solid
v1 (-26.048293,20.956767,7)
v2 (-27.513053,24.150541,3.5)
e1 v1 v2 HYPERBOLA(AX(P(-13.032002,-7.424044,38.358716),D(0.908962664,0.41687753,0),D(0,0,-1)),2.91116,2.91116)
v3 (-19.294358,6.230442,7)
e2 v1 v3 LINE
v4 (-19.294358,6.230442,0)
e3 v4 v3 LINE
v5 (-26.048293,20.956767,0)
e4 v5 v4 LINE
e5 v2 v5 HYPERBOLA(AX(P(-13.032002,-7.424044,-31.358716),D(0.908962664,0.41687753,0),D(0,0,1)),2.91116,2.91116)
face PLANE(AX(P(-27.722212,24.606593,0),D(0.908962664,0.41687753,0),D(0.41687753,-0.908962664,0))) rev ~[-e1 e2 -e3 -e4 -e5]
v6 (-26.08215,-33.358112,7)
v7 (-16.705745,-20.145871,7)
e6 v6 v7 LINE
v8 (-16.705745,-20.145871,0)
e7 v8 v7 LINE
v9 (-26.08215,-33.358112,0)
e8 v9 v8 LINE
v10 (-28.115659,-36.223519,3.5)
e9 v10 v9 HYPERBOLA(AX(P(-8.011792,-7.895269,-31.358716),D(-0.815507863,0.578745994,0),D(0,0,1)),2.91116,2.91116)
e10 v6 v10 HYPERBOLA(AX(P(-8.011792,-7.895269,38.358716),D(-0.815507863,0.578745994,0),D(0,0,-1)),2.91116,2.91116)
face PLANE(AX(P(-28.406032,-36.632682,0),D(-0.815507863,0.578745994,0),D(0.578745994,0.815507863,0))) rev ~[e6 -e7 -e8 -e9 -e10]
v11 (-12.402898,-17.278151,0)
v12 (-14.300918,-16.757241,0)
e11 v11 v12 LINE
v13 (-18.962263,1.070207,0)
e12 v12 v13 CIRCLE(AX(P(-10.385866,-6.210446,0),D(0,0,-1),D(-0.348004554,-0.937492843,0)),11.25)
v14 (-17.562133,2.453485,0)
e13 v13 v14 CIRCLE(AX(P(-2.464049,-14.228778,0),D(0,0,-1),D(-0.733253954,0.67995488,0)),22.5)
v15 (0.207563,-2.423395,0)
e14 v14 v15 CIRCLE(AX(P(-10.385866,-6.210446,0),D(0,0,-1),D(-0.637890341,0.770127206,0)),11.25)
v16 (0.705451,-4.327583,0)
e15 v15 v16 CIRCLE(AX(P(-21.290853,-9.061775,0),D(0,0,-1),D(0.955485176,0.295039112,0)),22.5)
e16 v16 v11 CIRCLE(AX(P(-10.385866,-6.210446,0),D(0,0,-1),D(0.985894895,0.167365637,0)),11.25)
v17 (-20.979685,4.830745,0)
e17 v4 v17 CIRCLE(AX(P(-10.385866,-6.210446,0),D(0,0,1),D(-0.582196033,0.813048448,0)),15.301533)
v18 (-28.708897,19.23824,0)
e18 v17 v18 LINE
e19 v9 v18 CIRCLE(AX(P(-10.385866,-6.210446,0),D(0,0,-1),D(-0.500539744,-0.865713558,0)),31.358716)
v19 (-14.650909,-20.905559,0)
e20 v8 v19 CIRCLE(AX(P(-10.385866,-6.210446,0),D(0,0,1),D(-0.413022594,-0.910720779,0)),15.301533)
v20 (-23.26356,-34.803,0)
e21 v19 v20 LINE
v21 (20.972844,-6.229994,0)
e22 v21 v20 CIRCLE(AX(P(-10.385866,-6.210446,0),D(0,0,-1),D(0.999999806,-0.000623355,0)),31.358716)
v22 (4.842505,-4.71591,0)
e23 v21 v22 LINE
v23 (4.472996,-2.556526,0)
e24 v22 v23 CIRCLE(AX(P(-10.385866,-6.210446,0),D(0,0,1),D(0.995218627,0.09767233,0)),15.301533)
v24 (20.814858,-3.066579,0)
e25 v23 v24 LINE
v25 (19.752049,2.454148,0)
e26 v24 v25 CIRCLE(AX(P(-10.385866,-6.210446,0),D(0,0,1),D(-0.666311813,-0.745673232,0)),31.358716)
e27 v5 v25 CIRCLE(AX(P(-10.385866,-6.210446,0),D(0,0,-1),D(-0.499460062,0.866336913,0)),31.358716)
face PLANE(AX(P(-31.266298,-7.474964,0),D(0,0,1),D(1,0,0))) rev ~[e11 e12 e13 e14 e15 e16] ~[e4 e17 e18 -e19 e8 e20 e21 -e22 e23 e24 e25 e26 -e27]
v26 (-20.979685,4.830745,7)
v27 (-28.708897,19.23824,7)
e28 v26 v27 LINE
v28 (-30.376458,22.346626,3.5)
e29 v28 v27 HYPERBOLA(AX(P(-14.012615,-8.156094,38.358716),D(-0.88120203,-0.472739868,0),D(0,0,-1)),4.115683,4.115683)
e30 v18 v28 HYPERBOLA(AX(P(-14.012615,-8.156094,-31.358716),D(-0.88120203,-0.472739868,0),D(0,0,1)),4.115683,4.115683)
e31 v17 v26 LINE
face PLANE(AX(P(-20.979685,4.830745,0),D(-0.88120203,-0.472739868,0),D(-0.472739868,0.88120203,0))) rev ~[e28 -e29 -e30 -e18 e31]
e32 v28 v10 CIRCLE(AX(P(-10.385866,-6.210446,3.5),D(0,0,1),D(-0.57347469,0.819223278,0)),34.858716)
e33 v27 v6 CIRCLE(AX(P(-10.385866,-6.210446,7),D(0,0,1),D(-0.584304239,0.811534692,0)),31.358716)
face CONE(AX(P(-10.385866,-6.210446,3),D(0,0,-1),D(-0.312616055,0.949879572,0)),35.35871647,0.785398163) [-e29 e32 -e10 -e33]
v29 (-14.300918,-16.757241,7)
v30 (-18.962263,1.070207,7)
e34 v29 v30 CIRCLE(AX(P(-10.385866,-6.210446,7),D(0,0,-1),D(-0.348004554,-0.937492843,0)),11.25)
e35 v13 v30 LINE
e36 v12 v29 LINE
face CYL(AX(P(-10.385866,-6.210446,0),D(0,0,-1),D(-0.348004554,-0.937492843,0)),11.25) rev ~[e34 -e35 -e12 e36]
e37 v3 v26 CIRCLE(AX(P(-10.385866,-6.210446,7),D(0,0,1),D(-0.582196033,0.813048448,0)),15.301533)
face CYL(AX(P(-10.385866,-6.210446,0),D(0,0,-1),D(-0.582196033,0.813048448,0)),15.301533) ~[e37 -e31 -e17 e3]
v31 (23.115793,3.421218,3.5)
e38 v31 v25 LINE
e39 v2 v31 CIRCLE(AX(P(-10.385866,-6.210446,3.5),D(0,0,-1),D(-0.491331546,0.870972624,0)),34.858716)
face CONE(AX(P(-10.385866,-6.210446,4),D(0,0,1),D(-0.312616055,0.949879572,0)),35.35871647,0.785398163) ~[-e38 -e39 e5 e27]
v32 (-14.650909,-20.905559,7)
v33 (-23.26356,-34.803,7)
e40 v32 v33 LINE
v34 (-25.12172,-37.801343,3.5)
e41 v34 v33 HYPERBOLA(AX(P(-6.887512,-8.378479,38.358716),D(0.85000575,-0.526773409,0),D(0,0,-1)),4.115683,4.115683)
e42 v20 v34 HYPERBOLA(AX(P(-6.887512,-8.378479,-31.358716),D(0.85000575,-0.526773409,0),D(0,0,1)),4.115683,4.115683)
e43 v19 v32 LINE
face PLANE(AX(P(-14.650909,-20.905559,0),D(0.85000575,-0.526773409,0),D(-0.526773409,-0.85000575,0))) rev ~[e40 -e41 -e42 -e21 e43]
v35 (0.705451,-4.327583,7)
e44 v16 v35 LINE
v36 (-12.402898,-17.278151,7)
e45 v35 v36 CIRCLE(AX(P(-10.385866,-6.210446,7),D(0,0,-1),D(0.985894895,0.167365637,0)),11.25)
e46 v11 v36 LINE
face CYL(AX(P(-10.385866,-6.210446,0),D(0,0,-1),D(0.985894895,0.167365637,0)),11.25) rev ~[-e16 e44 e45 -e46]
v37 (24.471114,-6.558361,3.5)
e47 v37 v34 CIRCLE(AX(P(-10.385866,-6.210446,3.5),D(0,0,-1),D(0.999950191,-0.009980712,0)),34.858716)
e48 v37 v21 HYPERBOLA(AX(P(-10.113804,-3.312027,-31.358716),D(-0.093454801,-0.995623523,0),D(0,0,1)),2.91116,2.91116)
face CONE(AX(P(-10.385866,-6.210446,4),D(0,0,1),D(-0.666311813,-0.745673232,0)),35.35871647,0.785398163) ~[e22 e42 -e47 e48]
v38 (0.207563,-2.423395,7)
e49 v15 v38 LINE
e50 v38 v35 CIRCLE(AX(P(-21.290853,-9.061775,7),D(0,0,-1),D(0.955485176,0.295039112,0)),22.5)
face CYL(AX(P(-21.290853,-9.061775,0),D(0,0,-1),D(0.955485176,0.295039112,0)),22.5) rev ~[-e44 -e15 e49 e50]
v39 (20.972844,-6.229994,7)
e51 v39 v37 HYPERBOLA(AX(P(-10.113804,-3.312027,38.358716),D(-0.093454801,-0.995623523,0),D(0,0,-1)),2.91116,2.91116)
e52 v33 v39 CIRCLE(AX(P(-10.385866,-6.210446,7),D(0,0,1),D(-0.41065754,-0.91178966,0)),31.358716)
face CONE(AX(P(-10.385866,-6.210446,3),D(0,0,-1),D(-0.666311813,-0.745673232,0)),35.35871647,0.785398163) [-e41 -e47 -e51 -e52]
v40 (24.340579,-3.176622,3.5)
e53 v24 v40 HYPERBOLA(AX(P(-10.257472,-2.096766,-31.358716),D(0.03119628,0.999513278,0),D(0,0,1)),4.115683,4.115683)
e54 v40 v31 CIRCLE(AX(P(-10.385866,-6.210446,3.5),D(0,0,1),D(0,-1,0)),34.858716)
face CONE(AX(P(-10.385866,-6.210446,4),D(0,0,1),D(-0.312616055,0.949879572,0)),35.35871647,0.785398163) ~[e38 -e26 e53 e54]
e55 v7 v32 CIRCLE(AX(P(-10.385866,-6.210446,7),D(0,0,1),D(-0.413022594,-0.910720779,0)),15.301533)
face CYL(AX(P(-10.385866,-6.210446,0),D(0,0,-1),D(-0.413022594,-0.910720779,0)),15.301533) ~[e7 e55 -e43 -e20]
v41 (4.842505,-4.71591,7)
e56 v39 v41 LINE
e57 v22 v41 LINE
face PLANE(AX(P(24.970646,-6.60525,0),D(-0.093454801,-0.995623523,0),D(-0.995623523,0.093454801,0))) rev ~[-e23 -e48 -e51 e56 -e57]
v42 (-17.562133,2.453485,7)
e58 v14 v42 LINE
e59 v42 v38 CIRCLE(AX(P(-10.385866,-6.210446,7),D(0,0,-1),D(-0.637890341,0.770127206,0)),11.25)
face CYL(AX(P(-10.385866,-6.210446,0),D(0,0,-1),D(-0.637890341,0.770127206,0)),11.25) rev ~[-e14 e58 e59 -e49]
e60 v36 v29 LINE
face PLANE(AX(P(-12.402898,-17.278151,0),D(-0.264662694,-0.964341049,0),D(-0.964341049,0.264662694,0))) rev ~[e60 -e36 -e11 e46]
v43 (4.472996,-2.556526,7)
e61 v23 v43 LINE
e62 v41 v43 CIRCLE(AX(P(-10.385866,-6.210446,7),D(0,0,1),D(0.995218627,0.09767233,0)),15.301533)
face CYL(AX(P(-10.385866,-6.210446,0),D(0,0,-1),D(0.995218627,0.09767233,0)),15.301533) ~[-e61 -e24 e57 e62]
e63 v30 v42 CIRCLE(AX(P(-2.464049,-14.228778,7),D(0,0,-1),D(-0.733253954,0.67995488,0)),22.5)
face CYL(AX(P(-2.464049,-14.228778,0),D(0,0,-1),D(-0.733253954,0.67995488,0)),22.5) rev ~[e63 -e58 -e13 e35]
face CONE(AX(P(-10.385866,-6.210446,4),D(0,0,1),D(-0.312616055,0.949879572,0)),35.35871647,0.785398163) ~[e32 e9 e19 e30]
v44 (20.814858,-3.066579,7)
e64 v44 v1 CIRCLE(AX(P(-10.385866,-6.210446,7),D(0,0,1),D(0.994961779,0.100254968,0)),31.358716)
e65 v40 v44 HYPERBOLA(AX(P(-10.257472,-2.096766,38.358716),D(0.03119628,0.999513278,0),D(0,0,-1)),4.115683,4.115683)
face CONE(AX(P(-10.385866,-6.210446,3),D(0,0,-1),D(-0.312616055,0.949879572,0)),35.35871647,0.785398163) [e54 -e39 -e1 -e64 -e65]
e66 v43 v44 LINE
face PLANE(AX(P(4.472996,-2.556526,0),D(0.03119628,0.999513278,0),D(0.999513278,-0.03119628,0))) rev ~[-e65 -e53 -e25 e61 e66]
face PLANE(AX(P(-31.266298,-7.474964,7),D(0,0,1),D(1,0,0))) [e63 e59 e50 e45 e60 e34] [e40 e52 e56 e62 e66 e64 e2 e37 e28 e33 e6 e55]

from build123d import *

# Parameters (mm, degrees)
F1_DEPTH     = 7
F2_T2_ANGLE  = 147.8228871573
F2_T4_ANGLE  = 147.8228871573
F2_T6_ANGLE  = 147.8228871573
F2_T8_ANGLE  = 147.8228871573
F2_T10_ANGLE = 147.8228871573
F2_T12_ANGLE = 147.8228871573


# Not quite as in the source:
# - a fillet or chamfer that OpenCascade refuses, or shapes differently, is made with other operations: its cross-section is extruded or revolved along the edge and cut away or added


with BuildPart() as f1:
    # F0 (on Top) → F1 (new body)
    with BuildSketch(Plane.XY):
        with BuildLine():
            Line((-28.4060324401, -36.6326823344), (-16.7057452382, -20.1458706432))
            ThreePointArc((-16.7057452382, -20.1458706432), (-25.4681782111, -8.7912963767), (-20.97968548, 4.8307453711))
            Line((-20.97968548, 4.8307453711), (-30.6144689612, 22.7902857677))
            ThreePointArc((-30.6144689612, 22.7902857677), (-45.7201890255, -7.5236357069), (-28.4060324401, -36.6326823344))
        make_face()
        with BuildLine():
            ThreePointArc((-19.29435824, 6.2304415143), (-5.0797919896, 8.1416439346), (4.4729958499, -2.5565256692))
            Line((4.4729958499, -2.5565256692), (24.8438058142, -3.1923286128))
            ThreePointArc((24.8438058142, -3.1923286128), (6.144039761, 25.0465694426), (-27.722212391, 24.6065933083))
            Line((-27.722212391, 24.6065933083), (-19.29435824, 6.2304415143))
        make_face()
        with BuildLine():
            ThreePointArc((4.9156669829, -6.2104463577), (-1.1968722093, -18.4456132191), (-14.6509092006, -20.9055587751))
            Line((-14.6509092006, -20.9055587751), (-25.3869356838, -38.229296228))
            ThreePointArc((-25.3869356838, -38.229296228), (8.4185504337, -36.154272809), (24.9706460004, -6.6052500471))
            Line((24.9706460004, -6.6052500471), (4.8425046474, -4.7159099443))
            ThreePointArc((4.8425046474, -4.7159099443), (4.8973654542, -5.4622833042), (4.9156669829, -6.2104463577))
        make_face()
        with BuildLine():
            Line((-16.7057452382, -20.1458706432), (-14.3009175091, -16.7572408399))
            ThreePointArc((-14.3009175091, -16.7572408399), (-21.2699622014, -9.0563128177), (-18.9622633915, 1.0702069463))
            Line((-18.9622633915, 1.0702069463), (-20.97968548, 4.8307453711))
            ThreePointArc((-20.97968548, 4.8307453711), (-25.4681782111, -8.7912963767), (-16.7057452382, -20.1458706432))
        make_face()
        with BuildLine():
            ThreePointArc((-17.5621326109, 2.4534847075), (-7.4084109648, 4.63839044), (0.2075629978, -2.4233952356))
            Line((0.2075629978, -2.4233952356), (4.4729958499, -2.5565256692))
            ThreePointArc((4.4729958499, -2.5565256692), (-5.0797919896, 8.1416439346), (-19.29435824, 6.2304415143))
            Line((-19.29435824, 6.2304415143), (-17.5621326109, 2.4534847075))
        make_face()
        with BuildLine():
            ThreePointArc((0.7054512892, -4.3275829408), (-2.4792256646, -14.2134166955), (-12.4028984371, -17.2781507839))
            Line((-12.4028984371, -17.2781507839), (-14.6509092006, -20.9055587751))
            ThreePointArc((-14.6509092006, -20.9055587751), (-1.1968722093, -18.4456132191), (4.9156669829, -6.2104463577))
            ThreePointArc((4.9156669829, -6.2104463577), (4.8973654542, -5.4622833042), (4.8425046474, -4.7159099443))
            Line((4.8425046474, -4.7159099443), (0.7054512892, -4.3275829408))
        make_face()
        with BuildLine():
            Line((-20.97968548, 4.8307453711), (-18.9622633915, 1.0702069463))
            ThreePointArc((-18.9622633915, 1.0702069463), (-18.2773306397, 1.7771628324), (-17.5621326109, 2.4534847075))
            Line((-17.5621326109, 2.4534847075), (-19.29435824, 6.2304415143))
            ThreePointArc((-19.29435824, 6.2304415143), (-20.1621039238, 5.5607939156), (-20.97968548, 4.8307453711))
        make_face()
        with BuildLine():
            ThreePointArc((0.2075629978, -2.4233952356), (0.4773383786, -3.3700423415), (0.7054512892, -4.3275829408))
            Line((0.7054512892, -4.3275829408), (4.8425046474, -4.7159099443))
            ThreePointArc((4.8425046474, -4.7159099443), (4.6964456573, -3.6295963387), (4.4729958499, -2.5565256692))
            Line((4.4729958499, -2.5565256692), (0.2075629978, -2.4233952356))
        make_face()
        with BuildLine():
            Line((-14.6509092006, -20.9055587751), (-12.4028984371, -17.2781507839))
            Line((-12.4028984371, -17.2781507839), (-14.3009175091, -16.7572408399))
            Line((-14.3009175091, -16.7572408399), (-16.7057452382, -20.1458706432))
            ThreePointArc((-16.7057452382, -20.1458706432), (-15.6919405642, -20.56253665), (-14.6509092006, -20.9055587751))
        make_face()
    extrude(amount=F1_DEPTH)

    # F2: chamfer of 4 on 6 edges, made by hand

    # F2_s1 → F2_t2 (revolve, cut)
    with BuildSketch(Plane(origin=(-11.2150452206, -3.6909975733, 0), x_dir=(0, 0, 1), z_dir=(0.9498795724, 0.3126160553, 0))):
        Polygon((3, -32.7063288851), (7, -28.7063288851), (7, -32.7063288851), align=None)
    revolve(axis=Axis((-10.3858662769, -6.2104463577, 7), (0, 0, 1)), revolution_arc=F2_T2_ANGLE, mode=Mode.SUBTRACT)

    # F2_s3 → F2_t4 (revolve, cut)
    with BuildSketch(Plane(origin=(-11.2150452206, -3.6909975733, 0), x_dir=(0, 0, 1), z_dir=(0.9498795724, 0.3126160553, 0))):
        Polygon((4, -32.7063288851), (0, -28.7063288851), (0, -32.7063288851), align=None)
    revolve(axis=Axis((-10.3858662769, -6.2104463577, 0), (0, 0, 1)), revolution_arc=F2_T4_ANGLE, mode=Mode.SUBTRACT)

    # F2_s5 → F2_t6 (revolve, cut)
    with BuildSketch(Plane(origin=(-2.6891726039, 2.4029660659, 0), x_dir=(0, 0, 1), z_dir=(-0.7456732317, 0.6663118126, 0))):
        Polygon((3, -46.9099054592), (7, -42.9099054592), (7, -46.9099054592), align=None)
    revolve(axis=Axis((-10.3858662769, -6.2104463577, 7), (0, 0, 1)), revolution_arc=F2_T6_ANGLE, mode=Mode.SUBTRACT)

    # F2_s7 → F2_t8 (revolve, cut)
    with BuildSketch(Plane(origin=(-2.6891726039, 2.4029660659, 0), x_dir=(0, 0, 1), z_dir=(-0.7456732317, 0.6663118126, 0))):
        Polygon((4, -46.9099054592), (0, -42.9099054592), (0, -46.9099054592), align=None)
    revolve(axis=Axis((-10.3858662769, -6.2104463577, 0), (0, 0, 1)), revolution_arc=F2_T8_ANGLE, mode=Mode.SUBTRACT)

    # F2_s9 → F2_t10 (revolve, cut)
    with BuildSketch(Plane(origin=(-1.6745815909, -8.0276380292, 0), x_dir=(0, 0, 1), z_dir=(-0.2042063407, -0.9789278678, 0))):
        Polygon((3, -26.4599150641), (7, -22.4599150641), (7, -26.4599150641), align=None)
    revolve(axis=Axis((-10.3858662769, -6.2104463577, 7), (0, 0, 1)), revolution_arc=F2_T10_ANGLE, mode=Mode.SUBTRACT)

    # F2_s11 → F2_t12 (revolve, cut)
    with BuildSketch(Plane(origin=(-1.6745815909, -8.0276380292, 0), x_dir=(0, 0, 1), z_dir=(-0.2042063407, -0.9789278678, 0))):
        Polygon((4, -26.4599150641), (0, -22.4599150641), (0, -26.4599150641), align=None)
    revolve(axis=Axis((-10.3858662769, -6.2104463577, 0), (0, 0, 1)), revolution_arc=F2_T12_ANGLE, mode=Mode.SUBTRACT)


solid = f1.part
